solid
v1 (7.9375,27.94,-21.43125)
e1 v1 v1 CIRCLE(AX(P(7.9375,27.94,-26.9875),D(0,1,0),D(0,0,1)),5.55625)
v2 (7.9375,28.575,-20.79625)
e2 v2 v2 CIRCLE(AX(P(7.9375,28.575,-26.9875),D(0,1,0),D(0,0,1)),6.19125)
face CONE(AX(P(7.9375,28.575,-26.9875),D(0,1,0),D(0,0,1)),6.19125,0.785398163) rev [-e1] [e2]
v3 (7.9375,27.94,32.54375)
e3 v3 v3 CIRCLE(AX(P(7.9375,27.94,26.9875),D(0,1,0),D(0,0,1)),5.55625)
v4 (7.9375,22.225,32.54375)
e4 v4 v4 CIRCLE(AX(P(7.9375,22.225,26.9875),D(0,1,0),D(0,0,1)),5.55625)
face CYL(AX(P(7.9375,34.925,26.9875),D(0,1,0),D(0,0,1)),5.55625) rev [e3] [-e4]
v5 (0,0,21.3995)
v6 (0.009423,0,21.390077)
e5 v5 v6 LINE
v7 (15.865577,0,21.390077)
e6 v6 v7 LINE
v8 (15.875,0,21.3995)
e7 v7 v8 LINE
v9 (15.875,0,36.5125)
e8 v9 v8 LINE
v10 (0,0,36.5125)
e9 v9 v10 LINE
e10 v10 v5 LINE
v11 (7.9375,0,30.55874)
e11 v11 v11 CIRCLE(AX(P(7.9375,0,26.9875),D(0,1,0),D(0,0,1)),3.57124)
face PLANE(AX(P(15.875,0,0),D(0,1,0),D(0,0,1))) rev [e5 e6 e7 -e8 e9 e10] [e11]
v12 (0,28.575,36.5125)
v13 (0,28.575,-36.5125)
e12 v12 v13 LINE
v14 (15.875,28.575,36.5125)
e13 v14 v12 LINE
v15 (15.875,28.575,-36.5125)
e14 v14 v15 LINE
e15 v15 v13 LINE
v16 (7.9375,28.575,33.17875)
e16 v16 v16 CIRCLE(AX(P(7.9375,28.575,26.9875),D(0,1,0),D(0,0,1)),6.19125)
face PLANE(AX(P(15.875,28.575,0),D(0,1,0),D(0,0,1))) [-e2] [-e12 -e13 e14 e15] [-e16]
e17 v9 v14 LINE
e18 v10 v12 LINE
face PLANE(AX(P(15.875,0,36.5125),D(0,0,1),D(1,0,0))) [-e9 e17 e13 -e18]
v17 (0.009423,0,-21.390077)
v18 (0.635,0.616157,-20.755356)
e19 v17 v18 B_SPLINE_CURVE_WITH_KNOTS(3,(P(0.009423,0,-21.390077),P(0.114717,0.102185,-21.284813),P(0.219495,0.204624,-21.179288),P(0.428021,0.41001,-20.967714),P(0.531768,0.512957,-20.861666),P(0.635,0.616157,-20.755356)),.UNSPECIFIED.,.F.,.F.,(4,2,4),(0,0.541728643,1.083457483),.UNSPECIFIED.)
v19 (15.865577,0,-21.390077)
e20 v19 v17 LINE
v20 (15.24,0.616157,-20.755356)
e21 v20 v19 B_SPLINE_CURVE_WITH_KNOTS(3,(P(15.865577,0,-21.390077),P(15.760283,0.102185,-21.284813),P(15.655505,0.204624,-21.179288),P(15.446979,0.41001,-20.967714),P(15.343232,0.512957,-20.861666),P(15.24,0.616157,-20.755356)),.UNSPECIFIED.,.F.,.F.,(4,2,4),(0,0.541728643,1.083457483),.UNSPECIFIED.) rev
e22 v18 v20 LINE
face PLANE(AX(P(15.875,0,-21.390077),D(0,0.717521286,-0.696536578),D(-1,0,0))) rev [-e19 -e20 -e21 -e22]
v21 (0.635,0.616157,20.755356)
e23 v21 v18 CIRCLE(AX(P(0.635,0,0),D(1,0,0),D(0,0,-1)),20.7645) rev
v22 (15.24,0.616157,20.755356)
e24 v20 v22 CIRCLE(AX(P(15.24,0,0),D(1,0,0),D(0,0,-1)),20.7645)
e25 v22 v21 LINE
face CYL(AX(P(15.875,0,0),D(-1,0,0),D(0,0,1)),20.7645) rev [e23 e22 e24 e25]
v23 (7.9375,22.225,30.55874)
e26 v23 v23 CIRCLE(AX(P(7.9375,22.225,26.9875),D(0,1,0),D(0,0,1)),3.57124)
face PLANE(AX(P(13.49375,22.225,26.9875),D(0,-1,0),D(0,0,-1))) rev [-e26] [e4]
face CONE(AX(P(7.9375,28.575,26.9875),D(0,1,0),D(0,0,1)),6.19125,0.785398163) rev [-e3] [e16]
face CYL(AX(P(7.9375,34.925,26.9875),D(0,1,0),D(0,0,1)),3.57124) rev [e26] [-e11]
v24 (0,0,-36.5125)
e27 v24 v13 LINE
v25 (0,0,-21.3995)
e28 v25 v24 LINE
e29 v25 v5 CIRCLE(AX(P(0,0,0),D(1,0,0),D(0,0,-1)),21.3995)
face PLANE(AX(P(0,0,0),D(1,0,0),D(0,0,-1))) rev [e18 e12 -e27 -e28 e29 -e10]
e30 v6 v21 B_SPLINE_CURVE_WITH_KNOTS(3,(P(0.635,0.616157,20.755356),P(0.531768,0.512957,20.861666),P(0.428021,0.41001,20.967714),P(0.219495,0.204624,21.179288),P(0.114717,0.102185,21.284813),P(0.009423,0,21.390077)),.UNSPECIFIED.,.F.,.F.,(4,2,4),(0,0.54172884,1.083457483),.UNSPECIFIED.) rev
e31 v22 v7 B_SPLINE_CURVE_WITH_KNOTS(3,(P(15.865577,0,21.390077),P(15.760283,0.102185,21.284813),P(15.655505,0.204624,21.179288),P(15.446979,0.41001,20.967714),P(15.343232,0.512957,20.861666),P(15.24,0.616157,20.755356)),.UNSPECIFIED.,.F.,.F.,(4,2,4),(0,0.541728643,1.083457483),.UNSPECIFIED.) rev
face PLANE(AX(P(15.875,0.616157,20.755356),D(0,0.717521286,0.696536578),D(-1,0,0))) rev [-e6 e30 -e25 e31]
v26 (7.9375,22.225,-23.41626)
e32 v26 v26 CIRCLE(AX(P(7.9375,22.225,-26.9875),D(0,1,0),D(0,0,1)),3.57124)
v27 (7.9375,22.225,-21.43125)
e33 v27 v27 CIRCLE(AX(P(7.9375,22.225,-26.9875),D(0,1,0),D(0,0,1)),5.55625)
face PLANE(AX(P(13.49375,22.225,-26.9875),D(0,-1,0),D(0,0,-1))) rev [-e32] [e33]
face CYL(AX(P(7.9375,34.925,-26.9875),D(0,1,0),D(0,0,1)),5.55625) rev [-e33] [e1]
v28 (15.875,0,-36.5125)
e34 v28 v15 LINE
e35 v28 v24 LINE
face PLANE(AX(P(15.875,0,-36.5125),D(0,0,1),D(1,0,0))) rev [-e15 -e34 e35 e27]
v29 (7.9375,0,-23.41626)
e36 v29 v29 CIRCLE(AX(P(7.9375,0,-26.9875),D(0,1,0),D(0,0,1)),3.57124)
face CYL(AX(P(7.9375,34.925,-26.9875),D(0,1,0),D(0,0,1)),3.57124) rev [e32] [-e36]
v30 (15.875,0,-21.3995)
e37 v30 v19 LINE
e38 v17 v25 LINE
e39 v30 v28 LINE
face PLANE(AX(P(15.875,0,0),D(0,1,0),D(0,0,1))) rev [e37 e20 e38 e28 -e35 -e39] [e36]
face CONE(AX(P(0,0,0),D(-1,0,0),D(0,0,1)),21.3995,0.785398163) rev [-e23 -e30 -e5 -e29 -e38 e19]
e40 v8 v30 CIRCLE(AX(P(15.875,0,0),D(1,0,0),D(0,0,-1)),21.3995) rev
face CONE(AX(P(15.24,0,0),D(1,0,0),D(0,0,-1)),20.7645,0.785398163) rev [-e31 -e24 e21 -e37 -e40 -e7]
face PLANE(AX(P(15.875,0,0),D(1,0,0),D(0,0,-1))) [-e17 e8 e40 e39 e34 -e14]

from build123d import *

# Parameters (mm, degrees)
BOSS_EXTRUDE1_DEPTH                           = 15.875
BOSS_EXTRUDE2_DEPTH                           = 15.875
CBORE_FOR_1_4_SOCKET_HEAD_CAP_SCREW1_AT_COUNT = 2
CBORE_FOR_1_4_SOCKET_HEAD_CAP_SCREW1_AT_PITCH = 53.975
MOVE_FACE1_BY                                 = 0.127
MOVE_FACE1_2_BY                               = 0.127
MOVE_START                                    = 28.575
MOVE_FACE2_OUTLINE_W                          = 15.875
MOVE_FACE2_OUTLINE_H                          = 73.025
MOVE_FACE2_OUTLINE_R                          = 5.55625
MOVE_FACE2_DEPTH                              = 6.35
MOVE_START_2                                  = 22.225
MOVE_FACE2_2_OUTLINE_R                        = 5.55625
MOVE_FACE2_2_OUTLINE_R_2                      = 3.57124
MOVE_FACE2_2_DEPTH                            = 6.35


with BuildPart() as part:
    # Sketch1 → Boss-Extrude1 (new body)
    with BuildSketch(Plane(origin=(0, 0, 0), x_dir=(0, 0, -1), z_dir=(1, 0, 0))):
        with BuildLine():
            Line((36.5125, 0), (20.6375, 0))
            ThreePointArc((20.6375, 0), (0, -20.6375), (-20.6375, 0))
            Line((-20.6375, 0), (-36.5125, 0))
            Line((-36.5125, 0), (-36.5125, -34.925))
            Line((-36.5125, -34.925), (36.5125, -34.925))
            Line((36.5125, -34.925), (36.5125, 0))
        make_face()
    extrude(amount=BOSS_EXTRUDE1_DEPTH)


with BuildPart() as body_2:
    # Sketch1<3> → Boss-Extrude2 (new body)
    with BuildSketch(Plane(origin=(0, 0, 0), x_dir=(0, 0, -1), z_dir=(1, 0, 0))):
        with BuildLine():
            ThreePointArc((-20.6375, 0), (0, 20.6375), (20.6375, 0))
            Line((20.6375, 0), (36.5125, 0))
            Line((36.5125, 0), (36.5125, 34.925))
            Line((36.5125, 34.925), (-36.5125, 34.925))
            Line((-36.5125, 34.925), (-36.5125, 0))
            Line((-36.5125, 0), (-20.6375, 0))
        make_face()
    extrude(amount=BOSS_EXTRUDE2_DEPTH)


with BuildPart() as cbore_for_1_4_socket_head_cap_screw1_tool:
    # Sketch4 → CBORE for 1/4 Socket Head Cap Screw1 (revolve)
    with BuildSketch(Plane(origin=(7.9375, 34.925, 26.9875), x_dir=(0, 0, 1), z_dir=(1, 0, 0))):
        Polygon((0, 0), (0, 69.85), (3.57124, 69.85), (3.57124, 6.35), (5.55625, 6.35), (5.55625, 0.635), (6.19125, 0), align=None)
    cbore_for_1_4_socket_head_cap_screw1 = revolve(axis=Axis((7.9375, 41.275, 26.9875), (0, -1, 0)))


with BuildPart() as part_1:
    add(part.part)

    # CBORE for 1/4 Socket Head Cap Screw1: cut by cbore_for_1_4_socket_head_cap_screw1_tool
    add(cbore_for_1_4_socket_head_cap_screw1_tool.part, mode=Mode.SUBTRACT)


with BuildPart() as body_2_1:
    add(body_2.part)

    # CBORE for 1/4 Socket Head Cap Screw1: cut by cbore_for_1_4_socket_head_cap_screw1_tool
    add(cbore_for_1_4_socket_head_cap_screw1_tool.part, mode=Mode.SUBTRACT)


with BuildPart() as cbore_for_1_4_socket_head_cap_screw1_at_tool:
    # CBORE for 1/4 Socket Head Cap Screw1 at: CBORE for 1/4 Socket Head Cap Screw1 ×2
    with Locations(*[(0, 0, -i * CBORE_FOR_1_4_SOCKET_HEAD_CAP_SCREW1_AT_PITCH) for i in range(1, CBORE_FOR_1_4_SOCKET_HEAD_CAP_SCREW1_AT_COUNT)]):
        add(cbore_for_1_4_socket_head_cap_screw1)


with BuildPart() as part_2:
    add(part_1.part)

    # CBORE for 1/4 Socket Head Cap Screw1 at: cut by cbore_for_1_4_socket_head_cap_screw1_at_tool
    add(cbore_for_1_4_socket_head_cap_screw1_at_tool.part, mode=Mode.SUBTRACT)

    # Move Face1 2: a curved face moved inward by 0.127
    add(Solid.thicken(part_2.faces().sort_by_distance((7.9375, -20.6375, 0))[0], -MOVE_FACE1_2_BY), mode=Mode.SUBTRACT)

    # Chamfer1
    # the kernel refuses this chamfer: 0.635 mm, written as the material it takes off along each edge
    with BuildSketch(Plane(origin=(0, 0, 0), x_dir=(0, 0.07868977926472538, -0.9968991516895122), z_dir=(0, 0.9968991516895122, 0.07868977926472538))) as chamfer1_piece_1:
        with BuildLine():
            Line((21.417460512, 0.017960512), (20.746539488, -0.652960512))
            Line((20.746539488, -0.652960512), (20.733839488, -0.652960512))
            ThreePointArc((20.733839488, -0.652960512), (20.7518, -0.326480256), (20.7518, 0))
            Line((20.7518, 0), (20.7645, 0.0127))
            ThreePointArc((20.7645, 0.0127), (21.090980256, 0.0127), (21.417460512, 0.030660512))
            Line((21.417460512, 0.030660512), (21.417460512, 0.017960512))
        make_face()
    revolve(axis=Axis((0, 0, 0), (-1, 0, 0)), revolution_arc=189.026516368, mode=Mode.SUBTRACT)
    with BuildSketch(Plane(origin=(-1.610111621, 0, -20.7645), x_dir=(0, 0, -1), z_dir=(1, 0, 0))) as chamfer1_piece_2:
        with BuildLine():
            Line((0.643801601, 0.017692029), (-0.027368853, -0.633849299))
            Line((-0.027368853, -0.633849299), (-0.040063261, -0.633472445))
            ThreePointArc((-0.040063261, -0.633472445), (-0.015119867, -0.316902726), (-0.0127, 0))
            Line((-0.0127, 0), (0, 0.0127))
            ThreePointArc((0, 0.0127), (0.3219008, 0.0127), (0.643801601, 0.030392029))
            Line((0.643801601, 0.030392029), (0.643801601, 0.017692029))
        make_face()
    extrude(amount=19.095223242, mode=Mode.SUBTRACT)
    with BuildSketch(Plane(origin=(-1.610111621, 0, 20.7645), x_dir=(0, -0.9998899044534173, -0.01483842889716635), z_dir=(1, 0, 0))) as chamfer1_piece_3:
        with BuildLine():
            Line((0.634185626, 0.017960512), (-0.027243086, -0.643468199))
            Line((-0.027243086, -0.643468199), (-0.039941687, -0.643279751))
            ThreePointArc((-0.039941687, -0.643279751), (-0.017475104, -0.321676913), (-0.012698602, 0.000188448))
            Line((-0.012698602, 0.000188448), (0.000188448, 0.012698602))
            ThreePointArc((0.000188448, 0.012698602), (0.317092192, 0.010415864), (0.633997178, 0.030659114))
            Line((0.633997178, 0.030659114), (0.634185626, 0.017960512))
        make_face()
    extrude(amount=19.095223242, mode=Mode.SUBTRACT)
    with BuildSketch(Plane(origin=(15.875, 0, 0), x_dir=(0, 0.0786897792647254, -0.9968991516895122), z_dir=(0, 0.9968991516895122, 0.0786897792647254))) as chamfer1_piece_4:
        with BuildLine():
            Line((20.746539488, 0.652960512), (21.417460512, -0.017960512))
            Line((21.417460512, -0.017960512), (21.417460512, -0.030660512))
            ThreePointArc((21.417460512, -0.030660512), (21.090980256, -0.0127), (20.7645, -0.0127))
            Line((20.7645, -0.0127), (20.7518, 0))
            ThreePointArc((20.7518, 0), (20.7518, 0.326480256), (20.733839488, 0.652960512))
            Line((20.733839488, 0.652960512), (20.746539488, 0.652960512))
        make_face()
    revolve(axis=Axis((15.875, 0, 0), (-1, 0, 0)), revolution_arc=189.026516368, mode=Mode.SUBTRACT)


with BuildPart() as body_2_2:
    add(body_2_1.part)

    # CBORE for 1/4 Socket Head Cap Screw1 at: cut by cbore_for_1_4_socket_head_cap_screw1_at_tool
    add(cbore_for_1_4_socket_head_cap_screw1_at_tool.part, mode=Mode.SUBTRACT)

    # Move Face1: a curved face moved inward by 0.127
    add(Solid.thicken(body_2_2.faces().sort_by_distance((7.9375, 20.6375, 0))[0], -MOVE_FACE1_BY), mode=Mode.SUBTRACT)

    # Move Face2: read off the stored shape, not the designer's step
    # Move Face2 outline → Move Face2 (cut)
    with BuildSketch(Plane(origin=(0, 0, 0), x_dir=(1, 0, 0), z_dir=(0, 1, 0)).offset(MOVE_START)):
        with Locations((7.9375, 0)):
            Rectangle(MOVE_FACE2_OUTLINE_W, MOVE_FACE2_OUTLINE_H)
        with Locations((7.9375, -26.9875)):
            Circle(MOVE_FACE2_OUTLINE_R, mode=Mode.SUBTRACT)
        with Locations((7.9375, 26.9875)):
            Circle(MOVE_FACE2_OUTLINE_R, mode=Mode.SUBTRACT)
    extrude(amount=MOVE_FACE2_DEPTH, mode=Mode.SUBTRACT)

    # Move Face2 2 outline → Move Face2 2 (cut)
    # profile 1 of 2: a face of its own
    with BuildSketch(Plane(origin=(0, 0, 0), x_dir=(1, 0, 0), z_dir=(0, 1, 0)).offset(MOVE_START_2)):
        with Locations((7.9375, 26.9875)):
            Circle(MOVE_FACE2_2_OUTLINE_R)
        with Locations((7.9375, 26.9875)):
            Circle(MOVE_FACE2_2_OUTLINE_R_2, mode=Mode.SUBTRACT)
    # profile 2 of 2: a face of its own
    with BuildSketch(Plane(origin=(0, 0, 0), x_dir=(1, 0, 0), z_dir=(0, 1, 0)).offset(MOVE_START_2)):
        with Locations((7.9375, -26.9875)):
            Circle(MOVE_FACE2_2_OUTLINE_R)
        with Locations((7.9375, -26.9875)):
            Circle(MOVE_FACE2_2_OUTLINE_R_2, mode=Mode.SUBTRACT)
    extrude(amount=MOVE_FACE2_2_DEPTH, mode=Mode.SUBTRACT)

    # Move Face2 3: loft between two sections, ruled curve by curve
    move_face2_3_from = [
        Edge.make_three_point_arc((7.9375, 27.94, -21.43125), (13.49375, 27.94, -26.9875), (7.9375, 27.94, -32.54375)),
        Edge.make_three_point_arc((7.9375, 27.94, -32.54375), (2.38125, 27.94, -26.9875), (7.9375, 27.94, -21.43125)),
    ]
    move_face2_3_to = [
        Edge.make_three_point_arc((7.9375, 28.575, -20.79625), (14.12875, 28.575, -26.9875), (7.9375, 28.575, -33.17875)),
        Edge.make_three_point_arc((7.9375, 28.575, -33.17875), (1.74625, 28.575, -26.9875), (7.9375, 28.575, -20.79625)),
    ]
    move_face2_3 = Solid(Shell([*[Face.make_surface_from_curves(move_face2_3_from[k], move_face2_3_to[k]) for k in range(2)], Face(Wire(move_face2_3_from)), Face(Wire(move_face2_3_to))]))
    add(move_face2_3, mode=Mode.SUBTRACT)

    # Move Face2 4: loft between two sections, ruled curve by curve
    move_face2_4_from = [
        Edge.make_three_point_arc((7.9375, 27.94, 32.54375), (13.49375, 27.94, 26.9875), (7.9375, 27.94, 21.43125)),
        Edge.make_three_point_arc((7.9375, 27.94, 21.43125), (2.38125, 27.94, 26.9875), (7.9375, 27.94, 32.54375)),
    ]
    move_face2_4_to = [
        Edge.make_three_point_arc((7.9375, 28.575, 33.17875), (14.12875, 28.575, 26.9875), (7.9375, 28.575, 20.79625)),
        Edge.make_three_point_arc((7.9375, 28.575, 20.79625), (1.74625, 28.575, 26.9875), (7.9375, 28.575, 33.17875)),
    ]
    move_face2_4 = Solid(Shell([*[Face.make_surface_from_curves(move_face2_4_from[k], move_face2_4_to[k]) for k in range(2)], Face(Wire(move_face2_4_from)), Face(Wire(move_face2_4_to))]))
    add(move_face2_4, mode=Mode.SUBTRACT)

    # Chamfer2
    # the kernel refuses this chamfer: 0.635 mm, written as the material it takes off along each edge
    with BuildSketch(Plane(origin=(0, 0, 0), x_dir=(0, -0.0786897792647251, 0.9968991516895122), z_dir=(0, -0.9968991516895122, -0.0786897792647251))) as chamfer2_piece_1:
        with BuildLine():
            Line((21.417460512, 0.017960512), (20.746539488, -0.652960512))
            Line((20.746539488, -0.652960512), (20.733839488, -0.652960512))
            ThreePointArc((20.733839488, -0.652960512), (20.7518, -0.326480256), (20.7518, 0))
            Line((20.7518, 0), (20.7645, 0.0127))
            ThreePointArc((20.7645, 0.0127), (21.090980256, 0.0127), (21.417460512, 0.030660512))
            Line((21.417460512, 0.030660512), (21.417460512, 0.017960512))
        make_face()
    revolve(axis=Axis((0, 0, 0), (-1, 0, 0)), revolution_arc=189.026516368, mode=Mode.SUBTRACT)
    with BuildSketch(Plane(origin=(-1.610111621, 0, 20.7645), x_dir=(0, 0, 1), z_dir=(1, 0, 0))) as chamfer2_piece_2:
        with BuildLine():
            Line((0.643801601, 0.017692029), (-0.027368853, -0.633849299))
            Line((-0.027368853, -0.633849299), (-0.040063261, -0.633472445))
            ThreePointArc((-0.040063261, -0.633472445), (-0.015119867, -0.316902726), (-0.0127, 0))
            Line((-0.0127, 0), (0, 0.0127))
            ThreePointArc((0, 0.0127), (0.3219008, 0.0127), (0.643801601, 0.030392029))
            Line((0.643801601, 0.030392029), (0.643801601, 0.017692029))
        make_face()
    extrude(amount=19.095223242, mode=Mode.SUBTRACT)
    with BuildSketch(Plane(origin=(-1.610111621, 0, -20.7645), x_dir=(0, 0.9998899044534173, 0.014838428897166573), z_dir=(1, 0, 0))) as chamfer2_piece_3:
        with BuildLine():
            Line((0.634185626, 0.017960512), (-0.027243086, -0.643468199))
            Line((-0.027243086, -0.643468199), (-0.039941687, -0.643279751))
            ThreePointArc((-0.039941687, -0.643279751), (-0.017475104, -0.321676913), (-0.012698602, 0.000188448))
            Line((-0.012698602, 0.000188448), (0.000188448, 0.012698602))
            ThreePointArc((0.000188448, 0.012698602), (0.317092192, 0.010415864), (0.633997178, 0.030659114))
            Line((0.633997178, 0.030659114), (0.634185626, 0.017960512))
        make_face()
    extrude(amount=19.095223242, mode=Mode.SUBTRACT)
    with BuildSketch(Plane(origin=(15.875, 0, 0), x_dir=(0, -0.07868977926472513, 0.9968991516895122), z_dir=(0, -0.9968991516895122, -0.07868977926472513))) as chamfer2_piece_4:
        with BuildLine():
            Line((20.746539488, 0.652960512), (21.417460512, -0.017960512))
            Line((21.417460512, -0.017960512), (21.417460512, -0.030660512))
            ThreePointArc((21.417460512, -0.030660512), (21.090980256, -0.0127), (20.7645, -0.0127))
            Line((20.7645, -0.0127), (20.7518, 0))
            ThreePointArc((20.7518, 0), (20.7518, 0.326480256), (20.733839488, 0.652960512))
            Line((20.733839488, 0.652960512), (20.746539488, 0.652960512))
        make_face()
    revolve(axis=Axis((15.875, 0, 0), (-1, 0, 0)), revolution_arc=189.026516368, mode=Mode.SUBTRACT)


solid = body_2_2.part
